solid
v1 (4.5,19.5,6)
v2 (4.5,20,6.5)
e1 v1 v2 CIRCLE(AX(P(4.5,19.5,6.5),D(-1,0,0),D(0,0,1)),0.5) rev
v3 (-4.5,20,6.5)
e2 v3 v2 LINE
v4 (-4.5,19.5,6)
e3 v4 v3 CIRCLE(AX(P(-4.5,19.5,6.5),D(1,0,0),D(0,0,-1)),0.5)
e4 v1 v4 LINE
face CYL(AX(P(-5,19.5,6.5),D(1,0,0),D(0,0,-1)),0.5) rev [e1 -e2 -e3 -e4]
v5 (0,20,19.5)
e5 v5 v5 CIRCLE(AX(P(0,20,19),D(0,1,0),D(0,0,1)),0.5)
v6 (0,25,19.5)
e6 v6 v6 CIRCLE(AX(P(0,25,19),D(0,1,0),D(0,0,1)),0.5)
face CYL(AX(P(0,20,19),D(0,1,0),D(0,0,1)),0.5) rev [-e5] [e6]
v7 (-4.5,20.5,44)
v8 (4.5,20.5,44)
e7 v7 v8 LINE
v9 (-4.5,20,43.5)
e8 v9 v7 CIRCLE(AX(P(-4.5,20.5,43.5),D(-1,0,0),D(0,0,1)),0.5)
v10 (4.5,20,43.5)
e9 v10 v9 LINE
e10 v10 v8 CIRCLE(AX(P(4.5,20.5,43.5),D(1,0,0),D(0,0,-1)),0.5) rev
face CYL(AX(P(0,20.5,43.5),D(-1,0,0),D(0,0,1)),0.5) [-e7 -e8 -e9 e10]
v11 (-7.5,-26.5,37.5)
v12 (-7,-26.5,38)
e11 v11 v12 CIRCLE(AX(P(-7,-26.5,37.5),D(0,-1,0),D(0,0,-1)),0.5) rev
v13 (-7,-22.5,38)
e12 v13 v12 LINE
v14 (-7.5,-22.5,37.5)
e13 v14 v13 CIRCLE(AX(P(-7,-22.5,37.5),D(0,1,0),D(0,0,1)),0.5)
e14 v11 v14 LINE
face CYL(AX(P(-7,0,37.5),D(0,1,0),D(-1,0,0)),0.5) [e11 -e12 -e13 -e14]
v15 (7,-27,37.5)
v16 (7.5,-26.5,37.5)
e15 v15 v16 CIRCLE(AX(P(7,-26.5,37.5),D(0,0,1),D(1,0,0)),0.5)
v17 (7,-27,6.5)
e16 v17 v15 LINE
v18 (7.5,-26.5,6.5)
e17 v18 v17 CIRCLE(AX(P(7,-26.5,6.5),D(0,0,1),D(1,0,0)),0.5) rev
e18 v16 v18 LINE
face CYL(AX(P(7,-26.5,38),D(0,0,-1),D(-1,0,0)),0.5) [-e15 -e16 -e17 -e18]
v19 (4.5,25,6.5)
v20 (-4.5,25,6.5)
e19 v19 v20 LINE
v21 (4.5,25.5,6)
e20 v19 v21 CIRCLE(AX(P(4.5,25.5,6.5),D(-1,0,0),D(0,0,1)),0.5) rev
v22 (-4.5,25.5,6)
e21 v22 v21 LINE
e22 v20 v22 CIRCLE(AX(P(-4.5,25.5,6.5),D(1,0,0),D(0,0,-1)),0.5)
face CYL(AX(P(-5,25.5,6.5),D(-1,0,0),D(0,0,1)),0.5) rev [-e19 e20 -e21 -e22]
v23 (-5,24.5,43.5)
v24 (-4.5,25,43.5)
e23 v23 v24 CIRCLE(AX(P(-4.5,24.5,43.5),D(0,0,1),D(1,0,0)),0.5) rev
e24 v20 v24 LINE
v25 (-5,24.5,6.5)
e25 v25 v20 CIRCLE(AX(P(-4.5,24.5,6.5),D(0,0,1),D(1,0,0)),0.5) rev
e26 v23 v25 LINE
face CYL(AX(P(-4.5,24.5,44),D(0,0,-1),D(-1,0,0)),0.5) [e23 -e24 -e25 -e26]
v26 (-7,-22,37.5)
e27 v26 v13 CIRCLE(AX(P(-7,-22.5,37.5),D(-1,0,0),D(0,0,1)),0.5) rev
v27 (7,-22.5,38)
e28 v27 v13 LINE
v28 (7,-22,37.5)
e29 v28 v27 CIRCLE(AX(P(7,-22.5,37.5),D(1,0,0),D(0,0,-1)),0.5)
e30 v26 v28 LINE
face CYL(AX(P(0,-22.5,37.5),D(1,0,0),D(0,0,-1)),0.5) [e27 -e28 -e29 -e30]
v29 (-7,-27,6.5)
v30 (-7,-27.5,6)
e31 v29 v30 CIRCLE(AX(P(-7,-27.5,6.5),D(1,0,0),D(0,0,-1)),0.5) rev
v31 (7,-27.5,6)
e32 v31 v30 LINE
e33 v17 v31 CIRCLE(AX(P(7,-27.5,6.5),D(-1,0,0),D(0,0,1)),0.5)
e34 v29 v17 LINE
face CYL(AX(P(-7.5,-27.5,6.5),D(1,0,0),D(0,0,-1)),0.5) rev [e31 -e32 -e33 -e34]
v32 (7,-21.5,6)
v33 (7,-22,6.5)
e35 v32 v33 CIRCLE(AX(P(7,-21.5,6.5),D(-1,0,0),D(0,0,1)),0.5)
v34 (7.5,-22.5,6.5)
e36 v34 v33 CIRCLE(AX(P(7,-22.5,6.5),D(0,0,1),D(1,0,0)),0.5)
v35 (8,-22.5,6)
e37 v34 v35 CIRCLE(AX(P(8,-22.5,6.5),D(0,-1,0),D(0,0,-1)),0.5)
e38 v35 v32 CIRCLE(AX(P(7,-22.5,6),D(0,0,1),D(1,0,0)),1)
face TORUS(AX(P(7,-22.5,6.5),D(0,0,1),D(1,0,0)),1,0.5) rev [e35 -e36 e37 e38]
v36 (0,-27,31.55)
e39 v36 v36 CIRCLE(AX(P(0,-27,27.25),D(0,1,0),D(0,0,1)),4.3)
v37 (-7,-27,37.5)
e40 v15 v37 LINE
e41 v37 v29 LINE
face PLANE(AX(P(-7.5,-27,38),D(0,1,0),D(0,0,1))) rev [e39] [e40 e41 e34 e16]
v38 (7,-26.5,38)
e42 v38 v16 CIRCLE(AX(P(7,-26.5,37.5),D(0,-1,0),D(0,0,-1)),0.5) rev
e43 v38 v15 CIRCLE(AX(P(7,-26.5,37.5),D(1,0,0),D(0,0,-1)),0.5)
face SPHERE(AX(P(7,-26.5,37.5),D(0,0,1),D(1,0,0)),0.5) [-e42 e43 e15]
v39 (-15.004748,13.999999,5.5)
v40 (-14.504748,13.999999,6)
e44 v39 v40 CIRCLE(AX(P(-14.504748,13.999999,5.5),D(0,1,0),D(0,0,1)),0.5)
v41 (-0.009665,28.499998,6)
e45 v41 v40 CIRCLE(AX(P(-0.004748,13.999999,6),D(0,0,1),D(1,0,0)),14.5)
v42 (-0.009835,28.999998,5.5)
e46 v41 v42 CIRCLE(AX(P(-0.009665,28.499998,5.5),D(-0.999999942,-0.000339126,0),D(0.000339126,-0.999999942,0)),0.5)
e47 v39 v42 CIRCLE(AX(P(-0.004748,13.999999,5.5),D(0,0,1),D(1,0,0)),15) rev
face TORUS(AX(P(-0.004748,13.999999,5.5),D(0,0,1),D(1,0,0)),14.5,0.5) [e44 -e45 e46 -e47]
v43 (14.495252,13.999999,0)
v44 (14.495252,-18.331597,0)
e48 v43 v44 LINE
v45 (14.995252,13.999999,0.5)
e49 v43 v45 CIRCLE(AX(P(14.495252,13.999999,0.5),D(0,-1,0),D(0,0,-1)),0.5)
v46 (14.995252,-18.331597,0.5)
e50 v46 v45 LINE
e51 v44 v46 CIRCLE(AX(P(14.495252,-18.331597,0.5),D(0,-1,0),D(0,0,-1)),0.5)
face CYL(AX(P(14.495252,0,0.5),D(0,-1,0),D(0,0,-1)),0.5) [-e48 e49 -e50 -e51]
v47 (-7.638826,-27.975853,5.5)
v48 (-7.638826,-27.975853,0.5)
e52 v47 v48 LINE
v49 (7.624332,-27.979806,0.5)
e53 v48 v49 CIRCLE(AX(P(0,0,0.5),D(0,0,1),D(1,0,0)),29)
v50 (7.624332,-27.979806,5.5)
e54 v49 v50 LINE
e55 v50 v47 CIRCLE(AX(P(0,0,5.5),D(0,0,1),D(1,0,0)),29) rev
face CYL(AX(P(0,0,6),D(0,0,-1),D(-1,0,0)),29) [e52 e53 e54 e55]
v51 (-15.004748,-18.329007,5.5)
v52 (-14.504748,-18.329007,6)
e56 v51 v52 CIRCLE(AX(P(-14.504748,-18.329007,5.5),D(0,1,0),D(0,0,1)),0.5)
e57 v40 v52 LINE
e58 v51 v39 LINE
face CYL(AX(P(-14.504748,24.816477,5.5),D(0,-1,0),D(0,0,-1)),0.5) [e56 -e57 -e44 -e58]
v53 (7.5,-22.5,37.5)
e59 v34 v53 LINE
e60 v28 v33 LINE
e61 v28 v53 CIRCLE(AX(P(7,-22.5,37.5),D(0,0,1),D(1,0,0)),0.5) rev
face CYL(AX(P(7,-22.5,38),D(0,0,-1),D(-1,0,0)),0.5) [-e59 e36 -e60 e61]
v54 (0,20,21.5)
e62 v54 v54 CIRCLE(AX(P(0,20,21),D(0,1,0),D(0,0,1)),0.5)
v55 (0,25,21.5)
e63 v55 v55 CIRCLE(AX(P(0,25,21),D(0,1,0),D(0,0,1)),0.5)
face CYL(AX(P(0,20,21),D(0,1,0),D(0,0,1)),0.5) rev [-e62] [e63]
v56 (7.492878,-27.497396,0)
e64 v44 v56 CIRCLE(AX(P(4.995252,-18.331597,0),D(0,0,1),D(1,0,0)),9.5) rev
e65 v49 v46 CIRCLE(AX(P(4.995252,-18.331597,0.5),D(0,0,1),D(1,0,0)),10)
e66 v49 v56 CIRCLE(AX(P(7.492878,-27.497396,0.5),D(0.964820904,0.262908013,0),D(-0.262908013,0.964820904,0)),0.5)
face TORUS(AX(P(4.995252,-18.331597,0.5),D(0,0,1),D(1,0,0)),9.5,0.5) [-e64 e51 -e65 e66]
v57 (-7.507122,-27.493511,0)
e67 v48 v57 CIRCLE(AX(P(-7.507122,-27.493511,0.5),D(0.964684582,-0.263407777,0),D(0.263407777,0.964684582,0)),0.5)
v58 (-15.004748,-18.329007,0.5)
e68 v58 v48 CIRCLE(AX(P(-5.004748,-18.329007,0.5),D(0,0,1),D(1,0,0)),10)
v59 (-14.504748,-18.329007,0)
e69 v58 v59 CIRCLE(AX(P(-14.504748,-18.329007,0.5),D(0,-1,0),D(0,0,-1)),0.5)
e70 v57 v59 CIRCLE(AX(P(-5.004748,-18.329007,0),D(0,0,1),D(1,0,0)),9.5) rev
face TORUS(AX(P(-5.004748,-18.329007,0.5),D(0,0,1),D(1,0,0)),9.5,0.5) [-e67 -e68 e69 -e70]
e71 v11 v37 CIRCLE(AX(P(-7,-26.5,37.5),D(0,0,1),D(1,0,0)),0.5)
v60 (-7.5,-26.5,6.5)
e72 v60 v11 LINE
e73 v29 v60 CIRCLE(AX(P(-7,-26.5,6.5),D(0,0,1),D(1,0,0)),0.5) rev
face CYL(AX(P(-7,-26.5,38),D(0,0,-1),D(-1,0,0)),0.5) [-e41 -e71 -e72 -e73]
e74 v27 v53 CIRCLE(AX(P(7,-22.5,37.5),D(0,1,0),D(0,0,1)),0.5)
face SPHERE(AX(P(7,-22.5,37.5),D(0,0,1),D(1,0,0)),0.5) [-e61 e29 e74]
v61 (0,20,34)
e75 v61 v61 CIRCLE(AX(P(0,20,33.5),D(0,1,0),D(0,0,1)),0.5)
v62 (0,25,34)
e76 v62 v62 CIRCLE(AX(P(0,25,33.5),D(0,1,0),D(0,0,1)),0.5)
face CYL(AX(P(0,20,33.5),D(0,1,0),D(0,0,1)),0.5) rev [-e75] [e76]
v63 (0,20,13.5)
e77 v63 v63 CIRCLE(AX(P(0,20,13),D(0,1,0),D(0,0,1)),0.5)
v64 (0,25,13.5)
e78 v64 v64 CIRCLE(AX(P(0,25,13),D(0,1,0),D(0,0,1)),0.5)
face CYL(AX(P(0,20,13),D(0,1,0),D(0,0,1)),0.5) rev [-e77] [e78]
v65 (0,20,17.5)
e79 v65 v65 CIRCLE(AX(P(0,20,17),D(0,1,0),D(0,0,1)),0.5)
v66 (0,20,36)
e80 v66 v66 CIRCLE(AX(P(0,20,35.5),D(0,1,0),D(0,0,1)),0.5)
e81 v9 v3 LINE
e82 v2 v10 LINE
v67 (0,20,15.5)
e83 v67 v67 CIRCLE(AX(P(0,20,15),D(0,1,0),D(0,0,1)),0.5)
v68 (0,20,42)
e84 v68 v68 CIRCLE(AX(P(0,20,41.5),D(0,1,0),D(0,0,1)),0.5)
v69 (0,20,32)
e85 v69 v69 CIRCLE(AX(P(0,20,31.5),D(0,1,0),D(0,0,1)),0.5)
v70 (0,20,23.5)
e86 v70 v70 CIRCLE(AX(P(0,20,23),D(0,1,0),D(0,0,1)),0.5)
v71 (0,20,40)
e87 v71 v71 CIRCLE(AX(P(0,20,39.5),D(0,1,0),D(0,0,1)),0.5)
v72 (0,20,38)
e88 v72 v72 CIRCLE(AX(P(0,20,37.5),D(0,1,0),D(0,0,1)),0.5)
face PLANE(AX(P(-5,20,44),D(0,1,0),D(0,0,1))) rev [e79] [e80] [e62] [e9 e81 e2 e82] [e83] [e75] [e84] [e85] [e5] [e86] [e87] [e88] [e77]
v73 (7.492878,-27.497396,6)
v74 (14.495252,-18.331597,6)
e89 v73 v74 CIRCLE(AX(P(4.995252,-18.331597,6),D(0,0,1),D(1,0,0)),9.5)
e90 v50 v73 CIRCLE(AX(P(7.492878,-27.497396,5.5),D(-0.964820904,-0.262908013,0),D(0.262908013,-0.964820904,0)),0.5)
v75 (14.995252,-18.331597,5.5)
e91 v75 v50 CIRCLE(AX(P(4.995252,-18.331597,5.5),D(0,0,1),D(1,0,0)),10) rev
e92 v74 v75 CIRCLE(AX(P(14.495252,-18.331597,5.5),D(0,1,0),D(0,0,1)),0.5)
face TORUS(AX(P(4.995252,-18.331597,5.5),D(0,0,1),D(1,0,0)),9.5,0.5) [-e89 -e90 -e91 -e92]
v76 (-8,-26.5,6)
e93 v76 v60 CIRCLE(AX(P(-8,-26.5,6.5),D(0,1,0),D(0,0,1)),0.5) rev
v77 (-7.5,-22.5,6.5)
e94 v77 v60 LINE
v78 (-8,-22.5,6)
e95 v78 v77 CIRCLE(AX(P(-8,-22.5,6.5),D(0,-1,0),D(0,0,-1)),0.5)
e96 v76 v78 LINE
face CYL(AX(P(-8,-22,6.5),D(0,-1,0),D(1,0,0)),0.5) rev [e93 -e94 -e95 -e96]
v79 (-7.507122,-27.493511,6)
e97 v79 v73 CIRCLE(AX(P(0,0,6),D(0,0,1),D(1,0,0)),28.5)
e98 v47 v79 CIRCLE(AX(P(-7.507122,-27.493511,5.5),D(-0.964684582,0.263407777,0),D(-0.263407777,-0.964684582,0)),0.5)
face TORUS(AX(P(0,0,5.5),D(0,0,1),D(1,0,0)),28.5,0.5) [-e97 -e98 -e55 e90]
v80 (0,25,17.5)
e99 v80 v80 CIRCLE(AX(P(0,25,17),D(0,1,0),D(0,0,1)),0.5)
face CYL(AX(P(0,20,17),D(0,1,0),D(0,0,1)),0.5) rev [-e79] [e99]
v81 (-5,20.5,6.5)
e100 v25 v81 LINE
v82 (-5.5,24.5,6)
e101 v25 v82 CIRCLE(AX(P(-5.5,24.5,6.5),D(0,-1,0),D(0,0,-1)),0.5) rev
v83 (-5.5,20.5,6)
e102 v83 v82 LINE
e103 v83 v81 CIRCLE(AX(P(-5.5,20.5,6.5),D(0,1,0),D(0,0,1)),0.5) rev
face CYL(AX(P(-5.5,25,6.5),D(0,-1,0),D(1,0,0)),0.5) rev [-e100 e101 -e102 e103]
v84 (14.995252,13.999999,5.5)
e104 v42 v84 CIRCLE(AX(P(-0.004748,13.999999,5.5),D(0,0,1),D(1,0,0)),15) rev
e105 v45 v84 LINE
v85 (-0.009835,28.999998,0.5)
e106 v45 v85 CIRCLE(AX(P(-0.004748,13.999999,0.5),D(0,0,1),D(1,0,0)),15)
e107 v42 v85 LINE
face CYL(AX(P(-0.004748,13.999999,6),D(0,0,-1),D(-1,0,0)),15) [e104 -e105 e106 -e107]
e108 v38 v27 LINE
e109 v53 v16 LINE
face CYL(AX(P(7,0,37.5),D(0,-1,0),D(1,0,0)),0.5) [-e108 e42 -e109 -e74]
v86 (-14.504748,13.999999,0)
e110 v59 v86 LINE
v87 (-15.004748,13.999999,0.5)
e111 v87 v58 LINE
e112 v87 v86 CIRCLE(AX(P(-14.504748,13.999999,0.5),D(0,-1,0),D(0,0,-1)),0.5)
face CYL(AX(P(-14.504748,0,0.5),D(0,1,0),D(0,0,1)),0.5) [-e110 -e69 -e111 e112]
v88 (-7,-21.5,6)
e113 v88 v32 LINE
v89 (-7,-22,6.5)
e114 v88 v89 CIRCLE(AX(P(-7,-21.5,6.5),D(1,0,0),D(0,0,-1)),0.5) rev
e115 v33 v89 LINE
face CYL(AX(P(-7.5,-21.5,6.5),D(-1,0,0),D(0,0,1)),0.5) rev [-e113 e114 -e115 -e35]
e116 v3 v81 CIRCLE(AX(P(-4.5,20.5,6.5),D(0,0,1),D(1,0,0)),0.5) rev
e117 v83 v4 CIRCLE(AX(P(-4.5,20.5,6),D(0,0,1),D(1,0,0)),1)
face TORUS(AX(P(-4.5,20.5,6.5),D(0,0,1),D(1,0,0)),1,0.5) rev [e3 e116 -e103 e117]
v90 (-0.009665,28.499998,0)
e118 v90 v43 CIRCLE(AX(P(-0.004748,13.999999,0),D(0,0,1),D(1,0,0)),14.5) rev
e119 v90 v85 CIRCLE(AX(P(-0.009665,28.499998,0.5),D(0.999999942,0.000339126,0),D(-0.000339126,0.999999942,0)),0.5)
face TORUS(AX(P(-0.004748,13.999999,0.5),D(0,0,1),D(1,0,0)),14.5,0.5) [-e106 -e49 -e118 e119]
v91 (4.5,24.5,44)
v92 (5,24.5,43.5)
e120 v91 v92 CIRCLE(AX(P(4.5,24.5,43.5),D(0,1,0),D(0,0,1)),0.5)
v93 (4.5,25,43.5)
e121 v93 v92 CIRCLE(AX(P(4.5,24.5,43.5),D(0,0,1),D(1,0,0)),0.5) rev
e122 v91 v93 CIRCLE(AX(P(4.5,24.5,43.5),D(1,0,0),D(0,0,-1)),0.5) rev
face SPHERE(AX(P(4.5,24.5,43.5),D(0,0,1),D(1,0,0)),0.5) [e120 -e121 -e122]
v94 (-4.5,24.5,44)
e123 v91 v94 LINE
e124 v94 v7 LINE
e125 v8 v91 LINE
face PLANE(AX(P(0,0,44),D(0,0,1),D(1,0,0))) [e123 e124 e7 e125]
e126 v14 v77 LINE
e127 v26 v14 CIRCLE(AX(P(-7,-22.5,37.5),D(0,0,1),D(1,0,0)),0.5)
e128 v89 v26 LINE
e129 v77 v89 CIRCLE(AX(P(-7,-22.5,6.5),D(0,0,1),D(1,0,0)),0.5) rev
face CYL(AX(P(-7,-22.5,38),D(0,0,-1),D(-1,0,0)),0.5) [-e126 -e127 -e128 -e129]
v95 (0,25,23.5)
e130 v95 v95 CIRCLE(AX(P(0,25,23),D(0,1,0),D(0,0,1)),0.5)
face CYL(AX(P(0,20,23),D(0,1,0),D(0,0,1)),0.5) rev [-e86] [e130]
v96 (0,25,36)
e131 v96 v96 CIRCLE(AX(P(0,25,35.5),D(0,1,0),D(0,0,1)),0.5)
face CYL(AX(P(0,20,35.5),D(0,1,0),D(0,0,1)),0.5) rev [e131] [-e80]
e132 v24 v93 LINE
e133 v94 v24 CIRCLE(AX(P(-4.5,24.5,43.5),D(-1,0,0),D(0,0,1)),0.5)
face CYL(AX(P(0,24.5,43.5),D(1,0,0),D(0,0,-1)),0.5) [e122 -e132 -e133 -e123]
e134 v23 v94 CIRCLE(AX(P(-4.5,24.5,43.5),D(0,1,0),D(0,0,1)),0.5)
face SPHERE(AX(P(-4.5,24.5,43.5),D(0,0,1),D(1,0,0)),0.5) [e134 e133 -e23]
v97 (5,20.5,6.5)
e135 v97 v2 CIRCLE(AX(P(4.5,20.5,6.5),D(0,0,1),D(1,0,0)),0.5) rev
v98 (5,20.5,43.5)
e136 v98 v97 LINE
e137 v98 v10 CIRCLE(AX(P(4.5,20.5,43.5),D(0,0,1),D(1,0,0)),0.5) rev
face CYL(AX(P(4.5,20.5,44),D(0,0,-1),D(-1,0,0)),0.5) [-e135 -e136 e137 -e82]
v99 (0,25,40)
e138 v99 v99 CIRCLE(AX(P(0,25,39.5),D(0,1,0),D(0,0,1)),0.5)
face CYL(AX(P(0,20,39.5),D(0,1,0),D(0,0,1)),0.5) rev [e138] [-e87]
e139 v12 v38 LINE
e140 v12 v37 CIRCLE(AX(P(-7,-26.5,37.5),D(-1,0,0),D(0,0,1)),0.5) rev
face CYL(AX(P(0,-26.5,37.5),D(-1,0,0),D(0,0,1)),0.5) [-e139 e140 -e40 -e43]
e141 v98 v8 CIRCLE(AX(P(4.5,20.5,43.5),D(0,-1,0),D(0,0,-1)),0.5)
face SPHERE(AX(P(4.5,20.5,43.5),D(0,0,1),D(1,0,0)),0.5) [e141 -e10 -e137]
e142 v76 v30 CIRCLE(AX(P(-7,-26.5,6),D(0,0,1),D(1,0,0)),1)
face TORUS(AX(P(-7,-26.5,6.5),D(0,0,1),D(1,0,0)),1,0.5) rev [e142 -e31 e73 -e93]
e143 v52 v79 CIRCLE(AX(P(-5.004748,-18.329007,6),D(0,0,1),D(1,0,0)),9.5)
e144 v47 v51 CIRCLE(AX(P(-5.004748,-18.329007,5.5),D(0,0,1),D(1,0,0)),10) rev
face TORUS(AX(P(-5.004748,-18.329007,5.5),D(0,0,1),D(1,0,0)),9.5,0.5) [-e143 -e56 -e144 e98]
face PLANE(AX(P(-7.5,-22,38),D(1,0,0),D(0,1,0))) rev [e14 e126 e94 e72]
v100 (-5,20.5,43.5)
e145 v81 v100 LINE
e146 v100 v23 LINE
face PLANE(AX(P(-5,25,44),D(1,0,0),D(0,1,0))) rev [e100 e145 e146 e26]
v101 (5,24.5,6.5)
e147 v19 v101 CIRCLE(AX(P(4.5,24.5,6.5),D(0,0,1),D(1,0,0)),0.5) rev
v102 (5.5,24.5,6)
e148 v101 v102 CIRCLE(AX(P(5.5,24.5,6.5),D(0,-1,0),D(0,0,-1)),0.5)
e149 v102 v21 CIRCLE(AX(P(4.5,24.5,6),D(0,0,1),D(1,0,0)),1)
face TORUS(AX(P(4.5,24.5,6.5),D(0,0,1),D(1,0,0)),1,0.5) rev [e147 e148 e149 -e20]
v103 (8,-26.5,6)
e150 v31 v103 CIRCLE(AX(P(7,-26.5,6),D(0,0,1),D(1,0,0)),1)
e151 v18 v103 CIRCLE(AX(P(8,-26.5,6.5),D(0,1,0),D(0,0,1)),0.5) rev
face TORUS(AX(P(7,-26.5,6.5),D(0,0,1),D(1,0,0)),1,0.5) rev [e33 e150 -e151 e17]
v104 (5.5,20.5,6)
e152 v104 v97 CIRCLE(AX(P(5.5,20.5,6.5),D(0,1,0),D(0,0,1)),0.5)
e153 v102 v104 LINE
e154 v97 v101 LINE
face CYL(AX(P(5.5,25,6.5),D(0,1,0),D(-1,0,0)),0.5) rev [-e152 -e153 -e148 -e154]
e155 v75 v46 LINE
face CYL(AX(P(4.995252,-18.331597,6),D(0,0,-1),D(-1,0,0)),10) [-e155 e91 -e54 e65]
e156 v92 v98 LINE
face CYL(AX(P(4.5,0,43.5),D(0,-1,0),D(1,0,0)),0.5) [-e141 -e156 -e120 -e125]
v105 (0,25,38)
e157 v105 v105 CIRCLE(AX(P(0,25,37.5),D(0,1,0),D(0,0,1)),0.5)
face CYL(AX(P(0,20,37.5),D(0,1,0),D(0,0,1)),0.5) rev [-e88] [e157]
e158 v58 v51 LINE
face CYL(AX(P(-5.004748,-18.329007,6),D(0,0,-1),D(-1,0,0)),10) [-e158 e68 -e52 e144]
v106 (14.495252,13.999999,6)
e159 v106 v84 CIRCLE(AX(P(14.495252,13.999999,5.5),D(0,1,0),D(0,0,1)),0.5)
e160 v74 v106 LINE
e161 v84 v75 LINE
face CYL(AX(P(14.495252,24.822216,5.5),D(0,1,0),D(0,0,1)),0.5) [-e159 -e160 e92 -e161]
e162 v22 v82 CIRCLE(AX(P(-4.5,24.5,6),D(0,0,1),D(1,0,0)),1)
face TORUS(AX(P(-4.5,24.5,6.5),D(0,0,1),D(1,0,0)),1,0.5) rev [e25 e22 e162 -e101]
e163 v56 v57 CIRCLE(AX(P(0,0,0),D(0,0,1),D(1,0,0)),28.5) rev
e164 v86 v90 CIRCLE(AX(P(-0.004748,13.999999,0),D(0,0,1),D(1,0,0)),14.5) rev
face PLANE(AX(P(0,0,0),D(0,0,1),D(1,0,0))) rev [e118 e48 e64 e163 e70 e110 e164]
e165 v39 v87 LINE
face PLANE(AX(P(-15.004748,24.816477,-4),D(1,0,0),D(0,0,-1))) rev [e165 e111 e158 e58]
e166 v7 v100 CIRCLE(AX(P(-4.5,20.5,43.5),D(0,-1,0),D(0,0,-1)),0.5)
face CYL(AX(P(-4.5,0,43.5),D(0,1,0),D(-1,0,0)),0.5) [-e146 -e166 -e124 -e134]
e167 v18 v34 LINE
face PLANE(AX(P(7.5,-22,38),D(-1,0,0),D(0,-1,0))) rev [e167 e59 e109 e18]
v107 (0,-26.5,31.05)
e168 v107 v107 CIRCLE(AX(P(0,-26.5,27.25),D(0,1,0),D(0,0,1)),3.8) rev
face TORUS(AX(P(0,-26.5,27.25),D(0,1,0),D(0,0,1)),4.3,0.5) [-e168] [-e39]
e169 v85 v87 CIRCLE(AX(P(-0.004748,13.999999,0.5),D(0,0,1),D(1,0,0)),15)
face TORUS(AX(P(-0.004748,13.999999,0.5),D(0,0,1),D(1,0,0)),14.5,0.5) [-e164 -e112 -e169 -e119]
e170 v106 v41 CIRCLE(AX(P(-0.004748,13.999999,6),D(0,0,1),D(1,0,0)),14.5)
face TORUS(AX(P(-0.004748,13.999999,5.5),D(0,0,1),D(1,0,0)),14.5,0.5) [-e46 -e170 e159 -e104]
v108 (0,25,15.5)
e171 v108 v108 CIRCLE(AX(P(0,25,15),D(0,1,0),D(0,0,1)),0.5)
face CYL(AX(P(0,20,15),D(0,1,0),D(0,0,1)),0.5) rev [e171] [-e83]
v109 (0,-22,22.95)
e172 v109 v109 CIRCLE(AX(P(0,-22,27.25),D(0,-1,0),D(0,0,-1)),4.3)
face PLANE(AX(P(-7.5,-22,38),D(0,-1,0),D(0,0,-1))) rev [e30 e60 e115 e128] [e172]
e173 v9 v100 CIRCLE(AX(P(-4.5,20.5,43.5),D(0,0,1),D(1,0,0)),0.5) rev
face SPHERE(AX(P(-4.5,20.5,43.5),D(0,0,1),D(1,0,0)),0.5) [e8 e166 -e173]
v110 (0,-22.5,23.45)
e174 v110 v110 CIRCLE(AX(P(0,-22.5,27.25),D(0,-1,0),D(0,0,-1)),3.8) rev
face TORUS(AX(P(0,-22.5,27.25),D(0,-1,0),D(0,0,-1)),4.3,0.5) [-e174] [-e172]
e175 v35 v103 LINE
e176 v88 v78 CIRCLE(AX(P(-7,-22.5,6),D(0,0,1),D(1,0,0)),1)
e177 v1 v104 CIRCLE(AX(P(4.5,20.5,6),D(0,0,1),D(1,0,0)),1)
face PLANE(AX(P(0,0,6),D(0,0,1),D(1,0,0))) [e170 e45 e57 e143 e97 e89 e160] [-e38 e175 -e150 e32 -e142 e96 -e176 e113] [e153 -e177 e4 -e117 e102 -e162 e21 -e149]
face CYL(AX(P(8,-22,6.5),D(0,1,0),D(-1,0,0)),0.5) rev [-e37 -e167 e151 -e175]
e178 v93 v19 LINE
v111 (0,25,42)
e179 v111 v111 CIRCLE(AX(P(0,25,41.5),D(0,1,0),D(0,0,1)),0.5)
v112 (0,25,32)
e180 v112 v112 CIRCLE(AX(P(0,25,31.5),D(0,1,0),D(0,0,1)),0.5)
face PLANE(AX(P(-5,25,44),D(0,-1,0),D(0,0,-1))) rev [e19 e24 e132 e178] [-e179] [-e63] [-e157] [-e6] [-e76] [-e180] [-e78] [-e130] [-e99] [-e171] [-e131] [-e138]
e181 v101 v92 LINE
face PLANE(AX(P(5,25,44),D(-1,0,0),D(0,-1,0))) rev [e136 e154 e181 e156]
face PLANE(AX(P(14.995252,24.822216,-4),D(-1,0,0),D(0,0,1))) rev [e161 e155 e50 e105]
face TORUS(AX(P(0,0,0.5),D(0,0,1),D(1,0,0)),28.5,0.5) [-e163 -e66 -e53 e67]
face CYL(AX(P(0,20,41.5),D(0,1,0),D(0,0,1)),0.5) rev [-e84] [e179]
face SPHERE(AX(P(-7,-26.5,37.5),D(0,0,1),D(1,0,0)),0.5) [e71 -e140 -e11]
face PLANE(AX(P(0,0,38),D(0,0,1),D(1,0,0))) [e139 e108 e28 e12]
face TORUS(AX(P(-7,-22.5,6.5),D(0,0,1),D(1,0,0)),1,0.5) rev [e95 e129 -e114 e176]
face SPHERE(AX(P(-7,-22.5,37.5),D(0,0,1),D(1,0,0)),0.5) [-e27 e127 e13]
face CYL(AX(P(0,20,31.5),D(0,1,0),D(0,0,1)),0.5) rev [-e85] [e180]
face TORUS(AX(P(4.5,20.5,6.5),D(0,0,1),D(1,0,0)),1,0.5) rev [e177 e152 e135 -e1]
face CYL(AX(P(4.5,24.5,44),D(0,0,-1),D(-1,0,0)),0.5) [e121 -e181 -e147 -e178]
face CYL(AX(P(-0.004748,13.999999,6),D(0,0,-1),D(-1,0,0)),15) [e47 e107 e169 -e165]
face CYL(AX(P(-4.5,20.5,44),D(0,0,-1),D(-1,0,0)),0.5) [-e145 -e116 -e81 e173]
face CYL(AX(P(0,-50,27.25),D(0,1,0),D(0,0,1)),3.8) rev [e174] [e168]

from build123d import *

# Parameters (mm, degrees)
SKETCH1_R           = 29
BOSS_EXTRUDE1_DEPTH = 6
CUT_EXTRUDE3_START  = -10
CUT_EXTRUDE3_DEPTH  = 10
FILLET2_R           = 15
FILLET3_R           = 10
SKETCH2_W           = 10
SKETCH2_H           = 5
BOSS_EXTRUDE2_DEPTH = 38
SKETCH3_R           = 0.5
CUT_EXTRUDE1_DEPTH  = 5
SKETCH4_W           = 15
SKETCH4_H           = 5
BOSS_EXTRUDE3_DEPTH = 32
SKETCH5_R           = 3.8
CUT_EXTRUDE2_DEPTH  = 28
FILLET4_R           = 0.5


with BuildPart() as part:
    # Sketch1 → Boss-Extrude1 (new body)
    with BuildSketch(Plane.XY):
        Circle(SKETCH1_R)
    extrude(amount=BOSS_EXTRUDE1_DEPTH)

    # Sketch6 → Cut-Extrude3 (cut)
    with BuildSketch(Plane.XY.offset(6).offset(CUT_EXTRUDE3_START)):
        with BuildLine():
            Line((-15.004747761, 24.816477281), (-15.004747761, -24.816477281))
            ThreePointArc((-15.004747761, -24.816477281), (-29, 0), (-15.004747761, 24.816477281))
        make_face()
        with BuildLine():
            Line((14.995252239, 24.822216063), (14.995252239, -24.822216063))
            ThreePointArc((14.995252239, -24.822216063), (29, 0), (14.995252239, 24.822216063))
        make_face()
    extrude(amount=CUT_EXTRUDE3_DEPTH, mode=Mode.SUBTRACT)

    # Fillet2
    fillet2_edges = [part.edges().sort_by_distance(p)[0] for p in [
        (-15.004747761, 24.816477281, 3),
        (14.995252239, 24.822216063, 3),
    ]]
    fillet(fillet2_edges, radius=FILLET2_R - 0.0001)  # a hair under: the kernel refuses the full size

    # Fillet3
    fillet3_edges = [part.edges().sort_by_distance(p)[0] for p in [
        (-15.004747761, -24.816477281, 3),
        (14.995252239, -24.822216063, 3),
    ]]
    fillet(fillet3_edges, radius=FILLET3_R)

    # Sketch2 → Boss-Extrude2 (add)
    with BuildSketch(Plane.XY.offset(6)):
        with Locations((0, 22.5)):
            Rectangle(SKETCH2_W, SKETCH2_H)
    extrude(amount=BOSS_EXTRUDE2_DEPTH)

    # Sketch3 → Cut-Extrude1 (cut)
    with BuildSketch(Plane(origin=(0, 25, 0), x_dir=(1, 0, 0), z_dir=(0, 1, 0))):
        with Locations(Location((0, -13, 0), (0, 0, 270))):
            Circle(SKETCH3_R)
        with Locations(Location((0, -15, 0), (0, 0, 270))):
            Circle(SKETCH3_R)
        with Locations(Location((0, -17, 0), (0, 0, 270))):
            Circle(SKETCH3_R)
        with Locations(Location((0, -19, 0), (0, 0, 270))):
            Circle(SKETCH3_R)
        with Locations(Location((0, -21, 0), (0, 0, 270))):
            Circle(SKETCH3_R)
        with Locations(Location((0, -23, 0), (0, 0, 270))):
            Circle(SKETCH3_R)
        with Locations(Location((0, -41.5, 0), (0, 0, 270))):
            Circle(SKETCH3_R)
        with Locations(Location((0, -39.5, 0), (0, 0, 270))):
            Circle(SKETCH3_R)
        with Locations(Location((0, -37.5, 0), (0, 0, 270))):
            Circle(SKETCH3_R)
        with Locations(Location((0, -35.5, 0), (0, 0, 270))):
            Circle(SKETCH3_R)
        with Locations(Location((0, -33.5, 0), (0, 0, 270))):
            Circle(SKETCH3_R)
        with Locations(Location((0, -31.5, 0), (0, 0, 270))):
            Circle(SKETCH3_R)
    extrude(amount=-CUT_EXTRUDE1_DEPTH, mode=Mode.SUBTRACT)

    # Sketch4 → Boss-Extrude3 (add)
    with BuildSketch(Plane.XY.offset(6)):
        with Locations((0, -24.5)):
            Rectangle(SKETCH4_W, SKETCH4_H)
    extrude(amount=BOSS_EXTRUDE3_DEPTH)

    # Sketch5 → Cut-Extrude2 (cut)
    with BuildSketch(Plane(origin=(0, -22, 0), x_dir=(1, 0, 0), z_dir=(0, 1, 0))):
        with Locations(Location((0, -27.25, 0), (0, 0, 270))):
            Circle(SKETCH5_R)
    extrude(amount=-CUT_EXTRUDE2_DEPTH, mode=Mode.SUBTRACT)

    # Fillet4
    fillet4_edges = [part.edges().sort_by_distance(p)[0] for p in [
        (7.5, -24.5, 6),
        (7.5, -27, 22),
        (0, -22, 6),
        (7.5, -22, 22),
        (-7.5, -24.5, 6),
        (-7.5, -22, 22),
        (0, -27, 6),
        (-7.5, -27, 22),
        (7.5, -24.5, 38),
        (0, -22, 38),
        (-7.5, -24.5, 38),
        (0, -27, 38),
        (0, -27, 23.45),
        (0, -22, 23.45),
        (14.995252239, -2.165748974, 6),
        (10.600122519, 24.608390671, 6),
        (-10.613214951, 24.604793667, 6),
        (14.995252239, -2.165748974, 0),
        (10.600122519, 24.608390671, 0),
        (-10.613214951, 24.604793667, 0),
        (-15.004747761, -2.16445395, 6),
        (-15.004747761, -2.16445395, 0),
        (-0.007511337, -28.999999027, 6),
        (12.941660272, -24.402396084, 6),
        (-12.952727935, -24.397747553, 6),
        (-0.007511337, -28.999999027, 0),
        (12.941660272, -24.402396084, 0),
        (-12.952727935, -24.397747553, 0),
        (5, 22.5, 6),
        (5, 20, 25),
        (0, 25, 6),
        (5, 25, 25),
        (-5, 22.5, 6),
        (-5, 25, 25),
        (0, 20, 6),
        (-5, 20, 25),
        (5, 22.5, 44),
        (0, 25, 44),
        (-5, 22.5, 44),
        (0, 20, 44),
    ]]
    fillet(fillet4_edges, radius=FILLET4_R)


solid = part.part
